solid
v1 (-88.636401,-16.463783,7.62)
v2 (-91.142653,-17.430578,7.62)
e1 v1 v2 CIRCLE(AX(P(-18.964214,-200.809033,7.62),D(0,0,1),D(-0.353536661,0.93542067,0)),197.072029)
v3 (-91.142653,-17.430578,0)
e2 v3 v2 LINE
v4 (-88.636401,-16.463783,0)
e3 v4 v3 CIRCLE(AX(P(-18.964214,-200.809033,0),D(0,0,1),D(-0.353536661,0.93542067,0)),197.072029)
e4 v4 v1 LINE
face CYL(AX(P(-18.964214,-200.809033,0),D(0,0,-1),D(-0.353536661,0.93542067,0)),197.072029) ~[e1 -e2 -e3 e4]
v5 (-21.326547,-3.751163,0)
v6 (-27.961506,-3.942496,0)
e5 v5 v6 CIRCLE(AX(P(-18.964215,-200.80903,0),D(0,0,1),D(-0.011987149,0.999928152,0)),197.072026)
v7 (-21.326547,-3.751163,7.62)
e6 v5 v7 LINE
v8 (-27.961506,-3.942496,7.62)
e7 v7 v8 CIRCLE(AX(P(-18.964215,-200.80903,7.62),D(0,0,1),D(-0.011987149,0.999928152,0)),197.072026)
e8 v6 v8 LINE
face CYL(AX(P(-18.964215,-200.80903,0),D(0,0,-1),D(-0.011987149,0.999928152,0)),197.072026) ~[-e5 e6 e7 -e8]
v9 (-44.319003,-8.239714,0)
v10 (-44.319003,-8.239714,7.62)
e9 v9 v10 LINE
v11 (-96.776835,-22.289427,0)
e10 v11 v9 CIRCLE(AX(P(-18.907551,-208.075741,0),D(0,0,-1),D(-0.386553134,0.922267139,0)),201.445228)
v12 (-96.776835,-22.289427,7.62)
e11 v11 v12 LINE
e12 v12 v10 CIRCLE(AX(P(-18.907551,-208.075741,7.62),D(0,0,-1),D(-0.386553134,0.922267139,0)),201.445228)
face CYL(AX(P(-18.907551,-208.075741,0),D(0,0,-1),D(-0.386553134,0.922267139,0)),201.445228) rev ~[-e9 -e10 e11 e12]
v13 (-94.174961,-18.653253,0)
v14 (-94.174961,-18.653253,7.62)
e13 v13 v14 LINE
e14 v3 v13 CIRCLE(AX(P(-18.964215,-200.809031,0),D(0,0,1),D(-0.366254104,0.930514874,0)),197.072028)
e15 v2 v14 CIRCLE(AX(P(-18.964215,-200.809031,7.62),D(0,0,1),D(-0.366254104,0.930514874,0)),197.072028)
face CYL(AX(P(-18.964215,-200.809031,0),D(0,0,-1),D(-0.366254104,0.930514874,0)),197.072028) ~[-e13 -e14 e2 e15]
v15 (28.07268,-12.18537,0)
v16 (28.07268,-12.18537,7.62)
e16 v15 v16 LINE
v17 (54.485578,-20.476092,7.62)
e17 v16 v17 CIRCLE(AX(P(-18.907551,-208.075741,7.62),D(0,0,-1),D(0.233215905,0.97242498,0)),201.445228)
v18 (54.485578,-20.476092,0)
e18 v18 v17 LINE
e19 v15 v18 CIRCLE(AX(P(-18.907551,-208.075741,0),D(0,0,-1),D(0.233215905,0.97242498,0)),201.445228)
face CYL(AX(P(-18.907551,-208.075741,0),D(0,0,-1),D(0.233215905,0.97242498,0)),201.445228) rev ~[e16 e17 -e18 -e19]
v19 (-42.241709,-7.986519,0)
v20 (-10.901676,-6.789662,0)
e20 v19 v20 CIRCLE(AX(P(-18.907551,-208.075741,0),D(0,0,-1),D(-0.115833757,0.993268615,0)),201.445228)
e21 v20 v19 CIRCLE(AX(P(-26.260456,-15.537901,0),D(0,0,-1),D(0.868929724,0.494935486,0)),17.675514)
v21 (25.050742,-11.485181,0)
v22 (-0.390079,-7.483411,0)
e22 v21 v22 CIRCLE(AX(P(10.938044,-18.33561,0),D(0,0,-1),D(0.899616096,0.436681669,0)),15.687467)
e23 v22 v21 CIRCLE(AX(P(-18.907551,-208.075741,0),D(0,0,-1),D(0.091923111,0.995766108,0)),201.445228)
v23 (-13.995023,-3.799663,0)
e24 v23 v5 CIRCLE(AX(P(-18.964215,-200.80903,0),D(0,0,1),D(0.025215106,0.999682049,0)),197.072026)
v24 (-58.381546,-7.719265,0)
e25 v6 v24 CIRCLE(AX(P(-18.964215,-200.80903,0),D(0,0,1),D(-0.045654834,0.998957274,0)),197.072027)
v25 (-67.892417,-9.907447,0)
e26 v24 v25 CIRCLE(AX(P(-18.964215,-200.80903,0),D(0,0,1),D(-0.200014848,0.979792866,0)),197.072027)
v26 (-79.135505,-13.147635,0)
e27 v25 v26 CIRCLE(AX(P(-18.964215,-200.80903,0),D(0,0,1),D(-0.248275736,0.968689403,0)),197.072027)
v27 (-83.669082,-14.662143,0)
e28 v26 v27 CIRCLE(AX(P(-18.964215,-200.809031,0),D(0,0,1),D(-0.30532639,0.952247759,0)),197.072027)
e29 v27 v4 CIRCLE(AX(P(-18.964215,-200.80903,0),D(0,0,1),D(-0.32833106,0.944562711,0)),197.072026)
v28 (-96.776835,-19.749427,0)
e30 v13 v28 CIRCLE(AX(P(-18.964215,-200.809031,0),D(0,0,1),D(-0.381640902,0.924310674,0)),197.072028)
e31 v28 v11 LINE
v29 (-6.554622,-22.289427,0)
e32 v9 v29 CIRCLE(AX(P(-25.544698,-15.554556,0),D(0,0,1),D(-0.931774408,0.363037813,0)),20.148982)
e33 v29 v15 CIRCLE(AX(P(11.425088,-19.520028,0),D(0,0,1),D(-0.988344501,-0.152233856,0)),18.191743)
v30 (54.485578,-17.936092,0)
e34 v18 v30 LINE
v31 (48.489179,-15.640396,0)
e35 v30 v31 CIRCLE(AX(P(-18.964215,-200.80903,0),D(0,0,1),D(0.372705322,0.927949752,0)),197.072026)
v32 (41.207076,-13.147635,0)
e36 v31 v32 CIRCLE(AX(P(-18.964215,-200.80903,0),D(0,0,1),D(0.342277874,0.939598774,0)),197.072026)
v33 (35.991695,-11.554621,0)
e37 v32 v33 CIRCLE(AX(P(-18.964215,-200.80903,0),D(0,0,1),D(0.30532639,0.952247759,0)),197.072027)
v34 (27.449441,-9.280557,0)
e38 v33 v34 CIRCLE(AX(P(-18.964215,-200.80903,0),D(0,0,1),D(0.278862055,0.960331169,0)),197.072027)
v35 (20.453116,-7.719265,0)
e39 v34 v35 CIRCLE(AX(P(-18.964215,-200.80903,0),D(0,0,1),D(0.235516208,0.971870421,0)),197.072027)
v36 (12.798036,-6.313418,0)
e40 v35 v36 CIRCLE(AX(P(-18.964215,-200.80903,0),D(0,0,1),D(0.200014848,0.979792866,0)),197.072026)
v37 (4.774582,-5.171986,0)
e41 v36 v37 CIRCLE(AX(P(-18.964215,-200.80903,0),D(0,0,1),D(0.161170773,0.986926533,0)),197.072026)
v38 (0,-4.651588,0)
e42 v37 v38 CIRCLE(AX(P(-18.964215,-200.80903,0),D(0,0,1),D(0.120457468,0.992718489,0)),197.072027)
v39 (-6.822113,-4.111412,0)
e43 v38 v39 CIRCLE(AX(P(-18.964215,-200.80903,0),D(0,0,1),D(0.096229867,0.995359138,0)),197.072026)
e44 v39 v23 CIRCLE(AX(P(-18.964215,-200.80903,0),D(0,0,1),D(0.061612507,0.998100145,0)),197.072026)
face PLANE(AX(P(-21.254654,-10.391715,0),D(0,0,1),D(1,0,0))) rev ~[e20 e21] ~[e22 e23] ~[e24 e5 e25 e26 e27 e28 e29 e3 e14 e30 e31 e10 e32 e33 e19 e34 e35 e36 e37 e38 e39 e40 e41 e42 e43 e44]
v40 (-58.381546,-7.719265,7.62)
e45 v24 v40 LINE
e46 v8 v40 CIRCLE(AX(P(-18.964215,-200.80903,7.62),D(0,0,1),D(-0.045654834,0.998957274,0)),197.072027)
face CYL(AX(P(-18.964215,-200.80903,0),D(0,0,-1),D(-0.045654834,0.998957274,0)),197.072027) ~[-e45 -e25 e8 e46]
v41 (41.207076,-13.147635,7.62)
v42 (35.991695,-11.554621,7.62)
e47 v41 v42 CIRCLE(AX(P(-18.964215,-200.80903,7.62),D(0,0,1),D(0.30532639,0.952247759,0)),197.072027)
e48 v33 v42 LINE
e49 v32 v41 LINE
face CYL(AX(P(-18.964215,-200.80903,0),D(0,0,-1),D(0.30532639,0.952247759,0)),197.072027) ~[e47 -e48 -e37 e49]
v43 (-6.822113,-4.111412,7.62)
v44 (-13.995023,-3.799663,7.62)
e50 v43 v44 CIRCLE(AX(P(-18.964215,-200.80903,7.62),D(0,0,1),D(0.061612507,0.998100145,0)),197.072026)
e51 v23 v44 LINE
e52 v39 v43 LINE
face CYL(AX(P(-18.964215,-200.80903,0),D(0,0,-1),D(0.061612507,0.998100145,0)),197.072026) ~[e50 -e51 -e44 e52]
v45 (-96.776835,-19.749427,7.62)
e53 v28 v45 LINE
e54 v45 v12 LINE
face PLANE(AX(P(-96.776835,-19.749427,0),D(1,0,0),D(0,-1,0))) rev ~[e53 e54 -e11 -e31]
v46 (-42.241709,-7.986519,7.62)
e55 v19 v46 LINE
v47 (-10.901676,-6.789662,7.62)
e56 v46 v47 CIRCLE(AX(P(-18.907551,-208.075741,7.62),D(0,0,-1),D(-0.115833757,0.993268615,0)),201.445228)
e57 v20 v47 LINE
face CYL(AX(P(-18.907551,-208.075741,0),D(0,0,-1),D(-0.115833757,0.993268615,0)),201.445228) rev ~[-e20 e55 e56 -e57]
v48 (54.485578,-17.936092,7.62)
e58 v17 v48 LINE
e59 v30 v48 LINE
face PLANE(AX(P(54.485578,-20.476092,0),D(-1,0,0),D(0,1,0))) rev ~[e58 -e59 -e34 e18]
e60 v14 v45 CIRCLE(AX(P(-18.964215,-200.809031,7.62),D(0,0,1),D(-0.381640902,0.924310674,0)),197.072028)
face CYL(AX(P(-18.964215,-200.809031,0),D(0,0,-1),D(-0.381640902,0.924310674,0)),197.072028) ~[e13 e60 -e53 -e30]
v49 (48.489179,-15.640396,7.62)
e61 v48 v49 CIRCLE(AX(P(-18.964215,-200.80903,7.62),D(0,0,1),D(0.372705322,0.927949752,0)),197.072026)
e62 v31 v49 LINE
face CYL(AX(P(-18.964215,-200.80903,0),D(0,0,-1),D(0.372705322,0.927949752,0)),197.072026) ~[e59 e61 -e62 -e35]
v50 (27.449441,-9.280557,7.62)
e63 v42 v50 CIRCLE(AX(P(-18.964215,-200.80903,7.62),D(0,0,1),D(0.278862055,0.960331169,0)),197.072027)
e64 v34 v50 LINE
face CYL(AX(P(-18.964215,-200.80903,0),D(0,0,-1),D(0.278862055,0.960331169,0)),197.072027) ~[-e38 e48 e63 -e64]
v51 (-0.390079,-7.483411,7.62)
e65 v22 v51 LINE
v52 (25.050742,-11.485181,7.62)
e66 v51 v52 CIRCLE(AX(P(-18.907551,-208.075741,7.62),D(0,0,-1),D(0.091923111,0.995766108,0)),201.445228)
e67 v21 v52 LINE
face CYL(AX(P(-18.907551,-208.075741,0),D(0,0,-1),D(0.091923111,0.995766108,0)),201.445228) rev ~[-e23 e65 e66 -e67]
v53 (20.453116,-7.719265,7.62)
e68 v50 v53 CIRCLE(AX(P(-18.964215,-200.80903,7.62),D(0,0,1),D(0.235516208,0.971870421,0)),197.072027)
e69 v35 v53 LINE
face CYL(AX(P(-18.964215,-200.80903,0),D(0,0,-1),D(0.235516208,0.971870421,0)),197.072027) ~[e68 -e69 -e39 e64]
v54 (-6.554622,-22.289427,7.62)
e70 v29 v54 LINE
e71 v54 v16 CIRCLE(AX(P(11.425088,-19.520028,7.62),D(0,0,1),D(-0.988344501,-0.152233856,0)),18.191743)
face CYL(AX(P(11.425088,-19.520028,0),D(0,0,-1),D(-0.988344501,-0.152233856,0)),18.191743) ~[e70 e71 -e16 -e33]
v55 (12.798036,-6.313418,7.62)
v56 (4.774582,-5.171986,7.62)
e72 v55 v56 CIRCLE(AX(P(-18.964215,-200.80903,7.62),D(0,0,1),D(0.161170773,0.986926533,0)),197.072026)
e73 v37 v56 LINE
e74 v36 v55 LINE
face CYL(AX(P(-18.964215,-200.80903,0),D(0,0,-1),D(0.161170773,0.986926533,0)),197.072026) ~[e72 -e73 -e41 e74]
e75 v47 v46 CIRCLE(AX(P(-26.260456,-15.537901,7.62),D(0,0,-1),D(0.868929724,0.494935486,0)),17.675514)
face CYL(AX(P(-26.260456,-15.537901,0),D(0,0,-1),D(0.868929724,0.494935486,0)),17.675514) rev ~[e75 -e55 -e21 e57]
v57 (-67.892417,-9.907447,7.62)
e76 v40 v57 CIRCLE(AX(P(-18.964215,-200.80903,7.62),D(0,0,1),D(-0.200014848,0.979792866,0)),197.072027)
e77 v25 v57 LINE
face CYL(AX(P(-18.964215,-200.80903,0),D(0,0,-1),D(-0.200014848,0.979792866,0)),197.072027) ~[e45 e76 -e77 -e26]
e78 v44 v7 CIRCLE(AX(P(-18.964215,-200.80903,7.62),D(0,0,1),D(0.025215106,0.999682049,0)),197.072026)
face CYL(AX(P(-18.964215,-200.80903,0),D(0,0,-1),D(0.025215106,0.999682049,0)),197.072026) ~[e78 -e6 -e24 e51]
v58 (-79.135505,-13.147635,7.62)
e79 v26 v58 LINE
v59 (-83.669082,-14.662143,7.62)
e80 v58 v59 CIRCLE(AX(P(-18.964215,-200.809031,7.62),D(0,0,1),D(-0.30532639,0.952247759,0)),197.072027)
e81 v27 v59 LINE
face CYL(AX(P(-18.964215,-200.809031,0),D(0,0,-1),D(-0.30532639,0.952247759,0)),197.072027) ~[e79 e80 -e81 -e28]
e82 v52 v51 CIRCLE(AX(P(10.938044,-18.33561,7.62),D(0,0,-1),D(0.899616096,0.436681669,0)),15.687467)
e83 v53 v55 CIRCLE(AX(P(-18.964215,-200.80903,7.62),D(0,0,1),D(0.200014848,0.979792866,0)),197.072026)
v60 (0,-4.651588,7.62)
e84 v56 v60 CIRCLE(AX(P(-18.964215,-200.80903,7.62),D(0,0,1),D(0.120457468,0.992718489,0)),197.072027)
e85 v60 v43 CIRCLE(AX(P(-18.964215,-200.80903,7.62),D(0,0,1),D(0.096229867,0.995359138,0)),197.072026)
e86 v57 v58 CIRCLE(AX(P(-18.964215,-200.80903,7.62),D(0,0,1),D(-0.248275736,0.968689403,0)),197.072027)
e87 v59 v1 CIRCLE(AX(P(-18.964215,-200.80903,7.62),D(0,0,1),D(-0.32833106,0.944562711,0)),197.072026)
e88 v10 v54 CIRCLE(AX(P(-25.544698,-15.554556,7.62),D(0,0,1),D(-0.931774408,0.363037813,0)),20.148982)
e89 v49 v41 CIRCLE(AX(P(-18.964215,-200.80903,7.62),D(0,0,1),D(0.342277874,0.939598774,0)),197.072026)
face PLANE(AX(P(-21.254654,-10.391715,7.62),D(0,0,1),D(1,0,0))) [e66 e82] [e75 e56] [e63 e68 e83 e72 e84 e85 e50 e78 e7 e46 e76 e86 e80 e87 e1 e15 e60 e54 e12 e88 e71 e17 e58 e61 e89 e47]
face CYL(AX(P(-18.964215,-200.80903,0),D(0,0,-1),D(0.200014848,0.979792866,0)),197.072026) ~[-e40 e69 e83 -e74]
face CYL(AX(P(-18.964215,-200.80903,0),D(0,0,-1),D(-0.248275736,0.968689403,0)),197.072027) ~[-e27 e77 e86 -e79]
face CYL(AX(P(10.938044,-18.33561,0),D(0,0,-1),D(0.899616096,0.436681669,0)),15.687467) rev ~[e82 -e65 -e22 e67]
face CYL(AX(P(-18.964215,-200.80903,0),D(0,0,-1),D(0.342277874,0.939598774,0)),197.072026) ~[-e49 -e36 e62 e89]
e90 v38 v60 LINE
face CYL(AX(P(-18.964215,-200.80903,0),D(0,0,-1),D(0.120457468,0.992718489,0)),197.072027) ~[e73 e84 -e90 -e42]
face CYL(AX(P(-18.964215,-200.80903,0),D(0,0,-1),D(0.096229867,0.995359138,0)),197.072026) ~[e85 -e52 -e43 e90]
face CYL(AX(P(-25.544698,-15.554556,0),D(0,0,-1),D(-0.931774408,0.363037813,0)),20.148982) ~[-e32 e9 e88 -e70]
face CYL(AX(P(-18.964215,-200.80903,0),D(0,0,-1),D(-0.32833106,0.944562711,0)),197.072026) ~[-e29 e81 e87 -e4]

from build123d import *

# Parameters (mm, degrees)
F1_DEPTH = 7.62


# Not quite as in the source:
# - a feature names something its author has since deleted; it is built from what else it names


with BuildPart() as f1:
    # F0 (on Top) → F1 (new body)
    with BuildSketch(Plane.XY):
        with BuildLine():
            ThreePointArc((28.0726799719, -12.1853696085), (41.4217161306, -15.8764714027), (54.48557809, -20.4760919879))
            Line((54.48557809, -20.4760919879), (54.48557809, -17.9360919879))
            ThreePointArc((54.48557809, -17.9360919879), (51.4967288592, -16.763821011), (48.4891792987, -15.6403956202))
            ThreePointArc((48.4891792987, -15.6403956202), (44.8602983758, -14.3584600038), (41.2070755106, -13.1476345109))
            ThreePointArc((41.2070755106, -13.1476345109), (38.6048957608, -12.3330871208), (35.9916952796, -11.5546205858))
            ThreePointArc((35.9916952796, -11.5546205858), (31.733320464, -10.3696867585), (27.4494413676, -9.2805567694))
            ThreePointArc((27.4494413676, -9.2805567694), (23.9583783923, -8.4680969379), (20.4531163964, -7.7192645032))
            ThreePointArc((20.4531163964, -7.7192645032), (16.632517094, -6.9785468001), (12.7980359257, -6.3134183048))
            ThreePointArc((12.7980359257, -6.3134183048), (8.7921771864, -5.7014539178), (4.7745823593, -5.1719858311))
            ThreePointArc((4.7745823593, -5.1719858311), (2.3888765712, -4.897241097), (0, -4.6515878779))
            ThreePointArc((0, -4.6515878779), (-3.408711726, -4.3518848821), (-6.8221133026, -4.111412028))
            ThreePointArc((-6.8221133026, -4.111412028), (-10.4071482604, -3.922869598), (-13.9950228451, -3.7996630199))
            ThreePointArc((-13.9950228451, -3.7996630199), (-17.6605592517, -3.7413156735), (-21.3265467845, -3.7511630261))
            ThreePointArc((-21.3265467845, -3.7511630261), (-24.644831847, -3.8188928365), (-27.9615056934, -3.9424957507))
            ThreePointArc((-27.9615056934, -3.9424957507), (-43.2450696176, -5.2385218831), (-58.3815462887, -7.7192645032))
            ThreePointArc((-58.3815462887, -7.7192645032), (-63.1505292395, -8.7544721801), (-67.8924174044, -9.907446573))
            ThreePointArc((-67.8924174044, -9.907446573), (-73.5380139988, -11.4440807397), (-79.1355054029, -13.1476345109))
            ThreePointArc((-79.1355054029, -13.1476345109), (-81.4068857464, -13.8911431732), (-83.6690823894, -14.6621426181))
            ThreePointArc((-83.6690823894, -14.6621426181), (-86.1587803012, -15.5463139993), (-88.6364011403, -16.4637831816))
            ThreePointArc((-88.6364011403, -16.4637831816), (-89.8911745679, -16.9429103569), (-91.1426533968, -17.430578221))
            ThreePointArc((-91.1426533968, -17.430578221), (-92.6613427932, -18.0356268436), (-94.1749608987, -18.6532525791))
            ThreePointArc((-94.1749608987, -18.6532525791), (-95.4778611275, -19.1966804672), (-96.7768352111, -19.7494274307))
            Line((-96.7768352111, -19.7494274307), (-96.7768352111, -22.2894274307))
            ThreePointArc((-96.7768352111, -22.2894274307), (-71.0235394951, -13.4887335549), (-44.319003481, -8.239713722))
            ThreePointArc((-44.319003481, -8.239713722), (-43.2806848499, -8.1104188526), (-42.2417086499, -7.9865188972))
            ThreePointArc((-42.2417086499, -7.9865188972), (-26.5950201746, -6.7772498749), (-10.9016764341, -6.7896617958))
            ThreePointArc((-10.9016764341, -6.7896617958), (-6.4890042329, -7.0136625153), (-2.0823062052, -7.3343878974))
            ThreePointArc((-2.0823062052, -7.3343878974), (-1.2360355683, -7.4071155247), (-0.3900791081, -7.4834107816))
            ThreePointArc((-0.3900791081, -7.4834107816), (12.3943473899, -9.0773217505), (25.050742044, -11.4851812603))
            ThreePointArc((25.050742044, -11.4851812603), (26.5630587768, -11.8294586082), (28.0726799719, -12.1853696085))
        make_face()
        with BuildLine():
            ThreePointArc((-44.319003481, -8.239713722), (-32.5703828211, -34.4389737288), (-6.5546215011, -22.2894274307))
            ThreePointArc((-6.5546215011, -22.2894274307), (-6.0039890378, -14.307850149), (-2.0823062052, -7.3343878974))
            ThreePointArc((-2.0823062052, -7.3343878974), (-6.4890042329, -7.0136625153), (-10.9016764341, -6.7896617958))
            ThreePointArc((-10.9016764341, -6.7896617958), (-25.5859305121, -33.2005400837), (-42.2417086499, -7.9865188972))
            ThreePointArc((-42.2417086499, -7.9865188972), (-43.2806848499, -8.1104188526), (-44.319003481, -8.239713722))
        make_face()
        with BuildLine():
            ThreePointArc((-6.5546215011, -22.2894274307), (16.5208344464, -36.9835014795), (28.0726799719, -12.1853696085))
            ThreePointArc((28.0726799719, -12.1853696085), (26.5630587768, -11.8294586082), (25.050742044, -11.4851812603))
            ThreePointArc((25.050742044, -11.4851812603), (8.5004214133, -33.8325331942), (-0.3900791081, -7.4834107816))
            ThreePointArc((-0.3900791081, -7.4834107816), (-1.2360355683, -7.4071155247), (-2.0823062052, -7.3343878974))
            ThreePointArc((-2.0823062052, -7.3343878974), (-6.0039890378, -14.307850149), (-6.5546215011, -22.2894274307))
        make_face()
    extrude(amount=F1_DEPTH)


solid = f1.part
